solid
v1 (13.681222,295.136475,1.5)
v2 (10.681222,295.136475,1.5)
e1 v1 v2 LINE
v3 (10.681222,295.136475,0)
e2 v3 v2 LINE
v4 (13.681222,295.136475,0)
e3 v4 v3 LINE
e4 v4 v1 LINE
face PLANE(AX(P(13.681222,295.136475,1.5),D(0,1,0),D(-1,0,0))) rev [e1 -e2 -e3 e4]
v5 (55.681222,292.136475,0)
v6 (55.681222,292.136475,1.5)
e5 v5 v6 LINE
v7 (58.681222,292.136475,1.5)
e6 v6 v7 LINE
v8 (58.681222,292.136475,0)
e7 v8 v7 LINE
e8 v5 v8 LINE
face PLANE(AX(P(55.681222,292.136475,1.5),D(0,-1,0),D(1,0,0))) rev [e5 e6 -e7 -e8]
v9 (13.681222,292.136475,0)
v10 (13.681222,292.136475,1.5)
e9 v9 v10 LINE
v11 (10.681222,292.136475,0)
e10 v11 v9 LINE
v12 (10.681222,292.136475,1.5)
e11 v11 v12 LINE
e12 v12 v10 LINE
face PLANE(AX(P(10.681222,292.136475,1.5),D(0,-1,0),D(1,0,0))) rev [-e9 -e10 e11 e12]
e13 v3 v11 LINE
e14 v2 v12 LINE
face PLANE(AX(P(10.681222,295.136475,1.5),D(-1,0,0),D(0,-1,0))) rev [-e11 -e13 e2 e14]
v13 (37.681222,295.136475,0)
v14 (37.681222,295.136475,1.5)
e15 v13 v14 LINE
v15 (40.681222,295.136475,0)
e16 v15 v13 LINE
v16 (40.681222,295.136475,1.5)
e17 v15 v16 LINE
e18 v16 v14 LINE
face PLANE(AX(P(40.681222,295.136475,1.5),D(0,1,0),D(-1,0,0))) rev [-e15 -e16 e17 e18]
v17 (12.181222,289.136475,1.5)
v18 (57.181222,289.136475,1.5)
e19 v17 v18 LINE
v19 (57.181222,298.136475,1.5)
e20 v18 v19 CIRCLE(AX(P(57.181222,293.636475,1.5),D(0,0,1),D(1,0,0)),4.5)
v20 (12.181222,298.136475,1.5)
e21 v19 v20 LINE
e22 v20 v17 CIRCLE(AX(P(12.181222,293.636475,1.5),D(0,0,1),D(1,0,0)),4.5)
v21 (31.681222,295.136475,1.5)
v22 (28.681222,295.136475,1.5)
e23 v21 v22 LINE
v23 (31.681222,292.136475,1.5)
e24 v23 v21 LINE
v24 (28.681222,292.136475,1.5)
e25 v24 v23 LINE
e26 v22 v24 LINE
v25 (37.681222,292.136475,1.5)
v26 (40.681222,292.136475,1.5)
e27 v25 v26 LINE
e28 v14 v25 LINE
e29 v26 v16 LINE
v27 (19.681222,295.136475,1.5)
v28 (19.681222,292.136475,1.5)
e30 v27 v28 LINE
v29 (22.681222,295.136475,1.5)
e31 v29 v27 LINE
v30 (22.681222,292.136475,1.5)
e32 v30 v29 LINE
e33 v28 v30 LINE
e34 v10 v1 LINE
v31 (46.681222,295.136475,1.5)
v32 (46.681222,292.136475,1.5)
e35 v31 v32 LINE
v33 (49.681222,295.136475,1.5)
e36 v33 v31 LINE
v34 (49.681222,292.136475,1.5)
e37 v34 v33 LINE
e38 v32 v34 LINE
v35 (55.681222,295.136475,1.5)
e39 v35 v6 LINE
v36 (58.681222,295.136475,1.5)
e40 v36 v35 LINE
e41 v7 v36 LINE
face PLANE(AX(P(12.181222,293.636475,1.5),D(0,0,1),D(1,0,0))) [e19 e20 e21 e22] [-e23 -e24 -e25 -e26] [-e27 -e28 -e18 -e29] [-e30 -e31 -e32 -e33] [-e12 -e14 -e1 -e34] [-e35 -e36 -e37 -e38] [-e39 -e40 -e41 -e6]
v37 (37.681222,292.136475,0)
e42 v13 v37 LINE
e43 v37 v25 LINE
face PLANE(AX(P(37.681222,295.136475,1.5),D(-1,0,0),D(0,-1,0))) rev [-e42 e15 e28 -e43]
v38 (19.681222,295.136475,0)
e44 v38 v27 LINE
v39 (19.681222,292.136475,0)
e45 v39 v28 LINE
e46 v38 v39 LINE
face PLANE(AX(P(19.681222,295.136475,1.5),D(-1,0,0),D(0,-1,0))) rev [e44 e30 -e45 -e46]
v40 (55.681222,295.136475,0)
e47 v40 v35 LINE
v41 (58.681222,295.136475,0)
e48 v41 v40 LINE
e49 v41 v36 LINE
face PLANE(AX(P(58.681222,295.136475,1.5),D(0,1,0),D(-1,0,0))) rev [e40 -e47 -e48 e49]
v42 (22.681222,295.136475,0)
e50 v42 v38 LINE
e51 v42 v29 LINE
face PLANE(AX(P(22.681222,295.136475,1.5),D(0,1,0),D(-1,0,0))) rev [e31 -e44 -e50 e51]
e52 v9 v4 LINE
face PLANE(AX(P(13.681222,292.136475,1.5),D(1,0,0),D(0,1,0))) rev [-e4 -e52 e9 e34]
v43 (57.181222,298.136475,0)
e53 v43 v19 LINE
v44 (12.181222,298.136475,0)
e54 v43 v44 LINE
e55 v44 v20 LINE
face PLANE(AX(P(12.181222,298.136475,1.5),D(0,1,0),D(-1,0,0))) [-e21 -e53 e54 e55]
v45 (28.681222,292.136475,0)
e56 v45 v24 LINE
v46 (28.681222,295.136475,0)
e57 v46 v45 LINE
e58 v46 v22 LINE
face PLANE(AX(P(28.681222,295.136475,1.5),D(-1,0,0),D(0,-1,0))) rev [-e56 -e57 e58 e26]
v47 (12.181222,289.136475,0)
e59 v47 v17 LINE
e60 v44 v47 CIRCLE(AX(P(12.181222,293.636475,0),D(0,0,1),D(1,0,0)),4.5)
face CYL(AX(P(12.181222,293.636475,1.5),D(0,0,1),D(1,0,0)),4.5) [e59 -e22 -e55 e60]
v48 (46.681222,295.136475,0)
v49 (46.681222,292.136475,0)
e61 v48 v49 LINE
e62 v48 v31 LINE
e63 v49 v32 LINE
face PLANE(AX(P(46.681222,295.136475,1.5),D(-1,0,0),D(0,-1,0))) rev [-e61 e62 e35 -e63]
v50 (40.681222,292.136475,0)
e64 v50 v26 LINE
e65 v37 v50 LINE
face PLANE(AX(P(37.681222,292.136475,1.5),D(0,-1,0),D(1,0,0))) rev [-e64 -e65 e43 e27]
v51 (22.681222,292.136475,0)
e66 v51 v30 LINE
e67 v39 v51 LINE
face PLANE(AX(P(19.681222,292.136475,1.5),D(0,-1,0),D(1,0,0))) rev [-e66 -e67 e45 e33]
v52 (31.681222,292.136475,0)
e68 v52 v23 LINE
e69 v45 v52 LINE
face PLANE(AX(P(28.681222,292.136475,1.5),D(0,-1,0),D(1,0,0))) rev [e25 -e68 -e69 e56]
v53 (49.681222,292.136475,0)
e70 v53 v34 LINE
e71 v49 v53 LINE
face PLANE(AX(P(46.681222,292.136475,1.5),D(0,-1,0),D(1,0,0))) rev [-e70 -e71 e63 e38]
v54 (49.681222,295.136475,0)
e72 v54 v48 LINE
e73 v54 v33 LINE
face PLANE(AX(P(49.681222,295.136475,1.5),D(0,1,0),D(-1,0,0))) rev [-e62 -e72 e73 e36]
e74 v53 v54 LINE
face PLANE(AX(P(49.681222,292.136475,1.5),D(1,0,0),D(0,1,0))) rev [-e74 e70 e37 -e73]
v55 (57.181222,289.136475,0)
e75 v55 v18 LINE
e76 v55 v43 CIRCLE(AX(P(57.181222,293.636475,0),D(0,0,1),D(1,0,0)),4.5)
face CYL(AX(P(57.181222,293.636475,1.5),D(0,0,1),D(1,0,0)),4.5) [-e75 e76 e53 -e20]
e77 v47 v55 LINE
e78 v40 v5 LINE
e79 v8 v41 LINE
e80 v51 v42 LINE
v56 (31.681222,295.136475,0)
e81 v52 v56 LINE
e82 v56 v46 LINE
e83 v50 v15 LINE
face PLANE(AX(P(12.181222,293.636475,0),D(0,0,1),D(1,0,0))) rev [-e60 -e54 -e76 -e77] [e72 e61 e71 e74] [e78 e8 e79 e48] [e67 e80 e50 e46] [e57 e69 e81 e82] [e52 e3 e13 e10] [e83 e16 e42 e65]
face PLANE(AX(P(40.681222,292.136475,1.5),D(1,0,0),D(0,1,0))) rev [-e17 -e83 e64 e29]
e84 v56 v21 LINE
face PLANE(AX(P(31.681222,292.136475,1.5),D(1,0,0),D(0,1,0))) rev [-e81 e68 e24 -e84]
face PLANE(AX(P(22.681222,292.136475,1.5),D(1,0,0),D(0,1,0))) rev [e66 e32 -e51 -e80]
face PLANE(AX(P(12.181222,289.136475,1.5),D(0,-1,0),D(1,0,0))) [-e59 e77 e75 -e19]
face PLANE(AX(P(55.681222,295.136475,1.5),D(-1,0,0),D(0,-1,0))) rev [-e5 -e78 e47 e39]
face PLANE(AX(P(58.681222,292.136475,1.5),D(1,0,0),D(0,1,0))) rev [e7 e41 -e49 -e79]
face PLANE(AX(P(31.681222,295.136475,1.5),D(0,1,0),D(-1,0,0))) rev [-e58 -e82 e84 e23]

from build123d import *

# Parameters (mm, degrees)
MODEL_W                 = 3
MODEL_H                 = 3
SALIENTE_EXTRUIR1_DEPTH = 1.5


with BuildPart() as part:
    # Model → Saliente-Extruir1 (new body)
    with BuildSketch(Plane.XY):
        with BuildLine():
            Line((12.181222481, 298.136475095), (57.181222481, 298.136475095))
            ThreePointArc((57.181222481, 298.136475095), (61.681222481, 293.636475095), (57.181222481, 289.136475095))
            Line((57.181222481, 289.136475095), (12.181222481, 289.136475095))
            ThreePointArc((12.181222481, 289.136475095), (7.681222481, 293.636475095), (12.181222481, 298.136475095))
        make_face()
        with Locations((12.181222481, 293.636475095)):
            Rectangle(MODEL_W, MODEL_H, mode=Mode.SUBTRACT)
        with Locations((21.181222481, 293.636475095)):
            Rectangle(MODEL_W, MODEL_H, mode=Mode.SUBTRACT)
        with Locations((30.181222481, 293.636475095)):
            Rectangle(MODEL_W, MODEL_H, mode=Mode.SUBTRACT)
        with Locations((39.181222481, 293.636475095)):
            Rectangle(MODEL_W, MODEL_H, mode=Mode.SUBTRACT)
        with Locations((57.181222481, 293.636475095)):
            Rectangle(MODEL_W, MODEL_H, mode=Mode.SUBTRACT)
        with Locations((48.181222481, 293.636475095)):
            Rectangle(MODEL_W, MODEL_H, mode=Mode.SUBTRACT)
    extrude(amount=SALIENTE_EXTRUIR1_DEPTH)


solid = part.part
